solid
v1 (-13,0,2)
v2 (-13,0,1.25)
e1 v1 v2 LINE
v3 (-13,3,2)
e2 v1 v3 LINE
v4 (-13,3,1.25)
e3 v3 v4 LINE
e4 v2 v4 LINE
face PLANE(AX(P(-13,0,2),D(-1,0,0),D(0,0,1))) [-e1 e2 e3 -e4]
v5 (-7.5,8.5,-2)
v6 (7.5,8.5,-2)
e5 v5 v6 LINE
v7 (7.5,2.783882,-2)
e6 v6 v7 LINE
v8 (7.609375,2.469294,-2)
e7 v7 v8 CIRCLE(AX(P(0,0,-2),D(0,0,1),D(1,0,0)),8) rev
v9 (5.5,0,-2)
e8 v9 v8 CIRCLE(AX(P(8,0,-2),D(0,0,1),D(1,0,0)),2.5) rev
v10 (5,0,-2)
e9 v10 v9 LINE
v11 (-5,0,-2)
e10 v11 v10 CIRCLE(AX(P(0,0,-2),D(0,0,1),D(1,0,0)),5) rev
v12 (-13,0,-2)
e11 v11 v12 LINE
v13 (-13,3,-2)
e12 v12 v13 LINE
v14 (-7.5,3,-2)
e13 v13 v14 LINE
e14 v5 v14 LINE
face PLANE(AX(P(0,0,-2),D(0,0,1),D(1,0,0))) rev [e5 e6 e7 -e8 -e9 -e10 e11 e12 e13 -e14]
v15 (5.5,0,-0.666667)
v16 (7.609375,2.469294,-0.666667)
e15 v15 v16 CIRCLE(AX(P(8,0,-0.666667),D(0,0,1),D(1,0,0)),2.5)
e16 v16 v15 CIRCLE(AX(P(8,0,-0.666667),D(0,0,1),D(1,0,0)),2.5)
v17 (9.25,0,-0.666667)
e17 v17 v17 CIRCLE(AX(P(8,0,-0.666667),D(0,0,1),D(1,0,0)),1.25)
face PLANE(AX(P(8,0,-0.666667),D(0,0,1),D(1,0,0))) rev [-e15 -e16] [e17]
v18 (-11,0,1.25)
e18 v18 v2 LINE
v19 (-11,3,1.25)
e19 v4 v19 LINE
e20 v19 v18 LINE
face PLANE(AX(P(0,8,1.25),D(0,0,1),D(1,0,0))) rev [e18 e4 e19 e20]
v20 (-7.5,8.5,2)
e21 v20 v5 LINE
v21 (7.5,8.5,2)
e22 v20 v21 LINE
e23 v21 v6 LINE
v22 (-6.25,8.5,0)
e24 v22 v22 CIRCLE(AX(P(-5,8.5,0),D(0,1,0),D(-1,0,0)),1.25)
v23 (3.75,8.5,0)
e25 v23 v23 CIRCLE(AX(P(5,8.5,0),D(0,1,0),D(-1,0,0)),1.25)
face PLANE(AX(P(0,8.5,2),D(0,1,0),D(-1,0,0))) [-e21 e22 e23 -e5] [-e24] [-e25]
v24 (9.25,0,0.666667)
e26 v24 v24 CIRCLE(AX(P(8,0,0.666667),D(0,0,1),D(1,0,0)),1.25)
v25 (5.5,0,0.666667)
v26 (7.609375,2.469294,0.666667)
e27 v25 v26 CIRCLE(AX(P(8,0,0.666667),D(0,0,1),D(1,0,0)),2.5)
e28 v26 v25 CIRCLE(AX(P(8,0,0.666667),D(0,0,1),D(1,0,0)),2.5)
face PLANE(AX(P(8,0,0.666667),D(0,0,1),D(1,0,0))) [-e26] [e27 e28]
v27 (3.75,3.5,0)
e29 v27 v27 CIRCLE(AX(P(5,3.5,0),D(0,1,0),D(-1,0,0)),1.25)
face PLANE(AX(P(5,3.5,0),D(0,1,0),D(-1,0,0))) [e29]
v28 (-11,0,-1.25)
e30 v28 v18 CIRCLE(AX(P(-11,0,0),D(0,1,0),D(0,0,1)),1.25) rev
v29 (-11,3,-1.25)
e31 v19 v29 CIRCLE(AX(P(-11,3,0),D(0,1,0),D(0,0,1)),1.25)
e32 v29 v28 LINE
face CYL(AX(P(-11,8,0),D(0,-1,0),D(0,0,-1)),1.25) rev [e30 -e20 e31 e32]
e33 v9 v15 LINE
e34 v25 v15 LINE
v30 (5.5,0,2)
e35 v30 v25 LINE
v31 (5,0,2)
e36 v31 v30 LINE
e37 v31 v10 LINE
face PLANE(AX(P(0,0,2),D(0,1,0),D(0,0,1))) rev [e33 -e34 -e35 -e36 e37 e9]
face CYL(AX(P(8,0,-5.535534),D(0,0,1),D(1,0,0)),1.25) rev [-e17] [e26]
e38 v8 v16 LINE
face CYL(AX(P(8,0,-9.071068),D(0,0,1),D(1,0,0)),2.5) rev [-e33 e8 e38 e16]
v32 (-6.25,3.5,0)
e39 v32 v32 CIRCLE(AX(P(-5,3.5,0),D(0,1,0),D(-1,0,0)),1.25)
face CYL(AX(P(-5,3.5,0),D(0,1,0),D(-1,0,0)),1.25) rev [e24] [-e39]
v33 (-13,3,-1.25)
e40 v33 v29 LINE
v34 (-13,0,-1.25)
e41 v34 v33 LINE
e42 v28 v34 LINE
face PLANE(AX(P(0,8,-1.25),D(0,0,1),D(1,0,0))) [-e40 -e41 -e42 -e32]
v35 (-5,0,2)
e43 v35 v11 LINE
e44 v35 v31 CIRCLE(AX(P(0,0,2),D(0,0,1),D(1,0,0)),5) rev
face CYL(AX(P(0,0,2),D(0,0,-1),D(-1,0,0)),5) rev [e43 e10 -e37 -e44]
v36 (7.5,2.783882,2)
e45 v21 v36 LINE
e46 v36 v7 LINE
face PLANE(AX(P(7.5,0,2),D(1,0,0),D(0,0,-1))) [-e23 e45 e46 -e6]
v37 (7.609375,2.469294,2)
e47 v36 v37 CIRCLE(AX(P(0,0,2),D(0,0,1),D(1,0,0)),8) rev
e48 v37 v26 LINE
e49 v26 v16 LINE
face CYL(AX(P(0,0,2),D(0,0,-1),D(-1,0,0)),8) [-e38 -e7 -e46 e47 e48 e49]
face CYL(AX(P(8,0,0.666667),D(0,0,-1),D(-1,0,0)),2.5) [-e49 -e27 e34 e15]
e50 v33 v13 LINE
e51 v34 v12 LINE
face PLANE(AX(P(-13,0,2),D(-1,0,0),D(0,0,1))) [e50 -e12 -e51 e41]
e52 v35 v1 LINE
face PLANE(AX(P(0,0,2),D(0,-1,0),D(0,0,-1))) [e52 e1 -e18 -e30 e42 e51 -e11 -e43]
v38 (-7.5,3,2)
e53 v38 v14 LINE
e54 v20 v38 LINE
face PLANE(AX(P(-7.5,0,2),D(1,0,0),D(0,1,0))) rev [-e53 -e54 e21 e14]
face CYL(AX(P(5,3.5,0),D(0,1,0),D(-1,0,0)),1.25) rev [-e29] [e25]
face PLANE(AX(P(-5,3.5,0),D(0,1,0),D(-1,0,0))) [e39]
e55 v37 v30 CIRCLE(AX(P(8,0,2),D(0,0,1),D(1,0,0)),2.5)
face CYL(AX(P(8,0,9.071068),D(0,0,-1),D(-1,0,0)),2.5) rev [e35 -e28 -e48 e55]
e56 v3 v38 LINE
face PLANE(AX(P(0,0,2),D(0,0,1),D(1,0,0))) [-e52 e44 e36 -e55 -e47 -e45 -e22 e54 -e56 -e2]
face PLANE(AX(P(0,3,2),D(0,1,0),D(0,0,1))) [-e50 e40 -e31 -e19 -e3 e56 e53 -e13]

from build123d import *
from OCP.BRepAlgoAPI import BRepAlgoAPI_Cut
from OCP.TopTools import TopTools_ListOfShape

# Parameters (mm, degrees)
BOSS_EXTRUDE1_DEPTH     = 2
SKETCH2_R               = 2.5
BOSS_EXTRUDE2_DEPTH     = 0.666666667
CUT_EXTRUDE1_START      = -4
SKETCH3_R               = 1.25
CUT_EXTRUDE1_DEPTH      = 4
CUT_EXTRUDE3_DEPTH      = 15.256577429
CUT_EXTRUDE3_DEPTH_BACK = 3
BOSS_EXTRUDE3_DEPTH     = 2
CUT_EXTRUDE8_START      = -0.666667
SKETCH7_R               = 2.5
CUT_EXTRUDE8_DEPTH      = 1.333333333
CUT_EXTRUDE9_START      = 2.000000333
SKETCH8_R               = 2.5
CUT_EXTRUDE9_DEPTH      = 1.333333333
SKETCH9_R               = 1.25
CUT_EXTRUDE10_DEPTH     = 5


with BuildPart() as part:
    # Sketch1 → Boss-Extrude1 (new, symmetric)
    with BuildSketch(Plane.XY):
        with BuildLine():
            Line((-8, 0), (-5, 0))
            ThreePointArc((-5, 0), (0, 5), (5, 0))
            Line((5, 0), (8, 0))
            ThreePointArc((8, 0), (1.5281381, 7.85269342), (-7.416198487, 3))
            ThreePointArc((-7.416198487, 3), (-7.85269342, 1.5281381), (-8, 0))
        make_face()
        with BuildLine():
            Line((-13, 0), (-8, 0))
            ThreePointArc((-8, 0), (-7.85269342, 1.5281381), (-7.416198487, 3))
            Line((-7.416198487, 3), (-13, 3))
            Line((-13, 3), (-13, 0))
        make_face()
    extrude(amount=BOSS_EXTRUDE1_DEPTH, both=True)

    # Sketch2 → Boss-Extrude2 (add, symmetric)
    with BuildSketch(Plane.XY):
        with Locations((8, 0)):
            Circle(SKETCH2_R)
    extrude(amount=BOSS_EXTRUDE2_DEPTH, both=True)

    # Sketch3 → Cut-Extrude1 (cut)
    with BuildSketch(Plane.XY.offset(2).offset(CUT_EXTRUDE1_START)):
        with Locations(Location((8, 0, 0), (0, 0, 94.480798786))):
            Circle(SKETCH3_R)
    extrude(amount=CUT_EXTRUDE1_DEPTH, mode=Mode.SUBTRACT)

    # Sketch4 → Cut-Extrude3 (cut, two sides: drawn at the far end of the back side and taken through both)
    with BuildSketch(Plane(origin=(0, 3, 0), x_dir=(1, 0, 0), z_dir=(0, 1, 0)).offset(-CUT_EXTRUDE3_DEPTH_BACK)):
        with BuildLine():
            ThreePointArc((-11, -1.25), (-9.75, 0), (-11, 1.25))
            Line((-11, 1.25), (-13, 1.25))
            Line((-13, 1.25), (-13, -1.25))
            Line((-13, -1.25), (-11, -1.25))
        make_face()
    extrude(amount=CUT_EXTRUDE3_DEPTH + CUT_EXTRUDE3_DEPTH_BACK, mode=Mode.SUBTRACT)

    # Sketch6 → Boss-Extrude3 (add, symmetric)
    with BuildSketch(Plane.XY):
        with BuildLine():
            Line((7.5, 8.5), (-7.5, 8.5))
            Line((-7.5, 8.5), (-7.5, 2.783882181))
            ThreePointArc((-7.5, 2.783882181), (0, 8), (7.5, 2.783882181))
            Line((7.5, 2.783882181), (7.5, 8.5))
        make_face()
    extrude(amount=BOSS_EXTRUDE3_DEPTH, both=True)


with BuildPart() as cut_extrude8_tool:
    # Sketch7 → Cut-Extrude8 (new body)
    with BuildSketch(Plane.XY.offset(CUT_EXTRUDE8_START)):
        with Locations((8, 0)):
            Circle(SKETCH7_R)
    extrude(amount=-CUT_EXTRUDE8_DEPTH)


with BuildPart() as part_1:
    add(part.part)

    # Cut-Extrude8: cut by cut_extrude8_tool, with a tolerance
    cut_extrude8_stock = TopTools_ListOfShape()
    cut_extrude8_stock.Append(part_1.part.wrapped)
    cut_extrude8_tools = TopTools_ListOfShape()
    cut_extrude8_tools.Append(cut_extrude8_tool.part.wrapped)
    cut_extrude8_cut = BRepAlgoAPI_Cut()
    cut_extrude8_cut.SetArguments(cut_extrude8_stock)
    cut_extrude8_cut.SetTools(cut_extrude8_tools)
    cut_extrude8_cut.SetFuzzyValue(0.00001)
    cut_extrude8_cut.Build()
    add(Compound.cast(cut_extrude8_cut.Shape()).solids(), mode=Mode.REPLACE)


with BuildPart() as cut_extrude9_tool:
    # Sketch8 → Cut-Extrude9 (new body)
    with BuildSketch(Plane.XY.offset(CUT_EXTRUDE9_START)):
        with Locations((8, 0)):
            Circle(SKETCH8_R)
    extrude(amount=-CUT_EXTRUDE9_DEPTH)


with BuildPart() as part_2:
    add(part_1.part)

    # Cut-Extrude9: cut by cut_extrude9_tool, with a tolerance
    cut_extrude9_stock = TopTools_ListOfShape()
    cut_extrude9_stock.Append(part_2.part.wrapped)
    cut_extrude9_tools = TopTools_ListOfShape()
    cut_extrude9_tools.Append(cut_extrude9_tool.part.wrapped)
    cut_extrude9_cut = BRepAlgoAPI_Cut()
    cut_extrude9_cut.SetArguments(cut_extrude9_stock)
    cut_extrude9_cut.SetTools(cut_extrude9_tools)
    cut_extrude9_cut.SetFuzzyValue(0.00001)
    cut_extrude9_cut.Build()
    add(Compound.cast(cut_extrude9_cut.Shape()).solids(), mode=Mode.REPLACE)

    # Sketch9 → Cut-Extrude10 (cut)
    with BuildSketch(Plane(origin=(0, 8.5, 0), x_dir=(1, 0, 0), z_dir=(0, 1, 0))):
        with Locations(Location((-5, 0, 0), (0, 0, 180))):
            Circle(SKETCH9_R)
        with Locations(Location((5, 0, 0), (0, 0, 180))):
            Circle(SKETCH9_R)
    extrude(amount=-CUT_EXTRUDE10_DEPTH, mode=Mode.SUBTRACT)


solid = part_2.part
